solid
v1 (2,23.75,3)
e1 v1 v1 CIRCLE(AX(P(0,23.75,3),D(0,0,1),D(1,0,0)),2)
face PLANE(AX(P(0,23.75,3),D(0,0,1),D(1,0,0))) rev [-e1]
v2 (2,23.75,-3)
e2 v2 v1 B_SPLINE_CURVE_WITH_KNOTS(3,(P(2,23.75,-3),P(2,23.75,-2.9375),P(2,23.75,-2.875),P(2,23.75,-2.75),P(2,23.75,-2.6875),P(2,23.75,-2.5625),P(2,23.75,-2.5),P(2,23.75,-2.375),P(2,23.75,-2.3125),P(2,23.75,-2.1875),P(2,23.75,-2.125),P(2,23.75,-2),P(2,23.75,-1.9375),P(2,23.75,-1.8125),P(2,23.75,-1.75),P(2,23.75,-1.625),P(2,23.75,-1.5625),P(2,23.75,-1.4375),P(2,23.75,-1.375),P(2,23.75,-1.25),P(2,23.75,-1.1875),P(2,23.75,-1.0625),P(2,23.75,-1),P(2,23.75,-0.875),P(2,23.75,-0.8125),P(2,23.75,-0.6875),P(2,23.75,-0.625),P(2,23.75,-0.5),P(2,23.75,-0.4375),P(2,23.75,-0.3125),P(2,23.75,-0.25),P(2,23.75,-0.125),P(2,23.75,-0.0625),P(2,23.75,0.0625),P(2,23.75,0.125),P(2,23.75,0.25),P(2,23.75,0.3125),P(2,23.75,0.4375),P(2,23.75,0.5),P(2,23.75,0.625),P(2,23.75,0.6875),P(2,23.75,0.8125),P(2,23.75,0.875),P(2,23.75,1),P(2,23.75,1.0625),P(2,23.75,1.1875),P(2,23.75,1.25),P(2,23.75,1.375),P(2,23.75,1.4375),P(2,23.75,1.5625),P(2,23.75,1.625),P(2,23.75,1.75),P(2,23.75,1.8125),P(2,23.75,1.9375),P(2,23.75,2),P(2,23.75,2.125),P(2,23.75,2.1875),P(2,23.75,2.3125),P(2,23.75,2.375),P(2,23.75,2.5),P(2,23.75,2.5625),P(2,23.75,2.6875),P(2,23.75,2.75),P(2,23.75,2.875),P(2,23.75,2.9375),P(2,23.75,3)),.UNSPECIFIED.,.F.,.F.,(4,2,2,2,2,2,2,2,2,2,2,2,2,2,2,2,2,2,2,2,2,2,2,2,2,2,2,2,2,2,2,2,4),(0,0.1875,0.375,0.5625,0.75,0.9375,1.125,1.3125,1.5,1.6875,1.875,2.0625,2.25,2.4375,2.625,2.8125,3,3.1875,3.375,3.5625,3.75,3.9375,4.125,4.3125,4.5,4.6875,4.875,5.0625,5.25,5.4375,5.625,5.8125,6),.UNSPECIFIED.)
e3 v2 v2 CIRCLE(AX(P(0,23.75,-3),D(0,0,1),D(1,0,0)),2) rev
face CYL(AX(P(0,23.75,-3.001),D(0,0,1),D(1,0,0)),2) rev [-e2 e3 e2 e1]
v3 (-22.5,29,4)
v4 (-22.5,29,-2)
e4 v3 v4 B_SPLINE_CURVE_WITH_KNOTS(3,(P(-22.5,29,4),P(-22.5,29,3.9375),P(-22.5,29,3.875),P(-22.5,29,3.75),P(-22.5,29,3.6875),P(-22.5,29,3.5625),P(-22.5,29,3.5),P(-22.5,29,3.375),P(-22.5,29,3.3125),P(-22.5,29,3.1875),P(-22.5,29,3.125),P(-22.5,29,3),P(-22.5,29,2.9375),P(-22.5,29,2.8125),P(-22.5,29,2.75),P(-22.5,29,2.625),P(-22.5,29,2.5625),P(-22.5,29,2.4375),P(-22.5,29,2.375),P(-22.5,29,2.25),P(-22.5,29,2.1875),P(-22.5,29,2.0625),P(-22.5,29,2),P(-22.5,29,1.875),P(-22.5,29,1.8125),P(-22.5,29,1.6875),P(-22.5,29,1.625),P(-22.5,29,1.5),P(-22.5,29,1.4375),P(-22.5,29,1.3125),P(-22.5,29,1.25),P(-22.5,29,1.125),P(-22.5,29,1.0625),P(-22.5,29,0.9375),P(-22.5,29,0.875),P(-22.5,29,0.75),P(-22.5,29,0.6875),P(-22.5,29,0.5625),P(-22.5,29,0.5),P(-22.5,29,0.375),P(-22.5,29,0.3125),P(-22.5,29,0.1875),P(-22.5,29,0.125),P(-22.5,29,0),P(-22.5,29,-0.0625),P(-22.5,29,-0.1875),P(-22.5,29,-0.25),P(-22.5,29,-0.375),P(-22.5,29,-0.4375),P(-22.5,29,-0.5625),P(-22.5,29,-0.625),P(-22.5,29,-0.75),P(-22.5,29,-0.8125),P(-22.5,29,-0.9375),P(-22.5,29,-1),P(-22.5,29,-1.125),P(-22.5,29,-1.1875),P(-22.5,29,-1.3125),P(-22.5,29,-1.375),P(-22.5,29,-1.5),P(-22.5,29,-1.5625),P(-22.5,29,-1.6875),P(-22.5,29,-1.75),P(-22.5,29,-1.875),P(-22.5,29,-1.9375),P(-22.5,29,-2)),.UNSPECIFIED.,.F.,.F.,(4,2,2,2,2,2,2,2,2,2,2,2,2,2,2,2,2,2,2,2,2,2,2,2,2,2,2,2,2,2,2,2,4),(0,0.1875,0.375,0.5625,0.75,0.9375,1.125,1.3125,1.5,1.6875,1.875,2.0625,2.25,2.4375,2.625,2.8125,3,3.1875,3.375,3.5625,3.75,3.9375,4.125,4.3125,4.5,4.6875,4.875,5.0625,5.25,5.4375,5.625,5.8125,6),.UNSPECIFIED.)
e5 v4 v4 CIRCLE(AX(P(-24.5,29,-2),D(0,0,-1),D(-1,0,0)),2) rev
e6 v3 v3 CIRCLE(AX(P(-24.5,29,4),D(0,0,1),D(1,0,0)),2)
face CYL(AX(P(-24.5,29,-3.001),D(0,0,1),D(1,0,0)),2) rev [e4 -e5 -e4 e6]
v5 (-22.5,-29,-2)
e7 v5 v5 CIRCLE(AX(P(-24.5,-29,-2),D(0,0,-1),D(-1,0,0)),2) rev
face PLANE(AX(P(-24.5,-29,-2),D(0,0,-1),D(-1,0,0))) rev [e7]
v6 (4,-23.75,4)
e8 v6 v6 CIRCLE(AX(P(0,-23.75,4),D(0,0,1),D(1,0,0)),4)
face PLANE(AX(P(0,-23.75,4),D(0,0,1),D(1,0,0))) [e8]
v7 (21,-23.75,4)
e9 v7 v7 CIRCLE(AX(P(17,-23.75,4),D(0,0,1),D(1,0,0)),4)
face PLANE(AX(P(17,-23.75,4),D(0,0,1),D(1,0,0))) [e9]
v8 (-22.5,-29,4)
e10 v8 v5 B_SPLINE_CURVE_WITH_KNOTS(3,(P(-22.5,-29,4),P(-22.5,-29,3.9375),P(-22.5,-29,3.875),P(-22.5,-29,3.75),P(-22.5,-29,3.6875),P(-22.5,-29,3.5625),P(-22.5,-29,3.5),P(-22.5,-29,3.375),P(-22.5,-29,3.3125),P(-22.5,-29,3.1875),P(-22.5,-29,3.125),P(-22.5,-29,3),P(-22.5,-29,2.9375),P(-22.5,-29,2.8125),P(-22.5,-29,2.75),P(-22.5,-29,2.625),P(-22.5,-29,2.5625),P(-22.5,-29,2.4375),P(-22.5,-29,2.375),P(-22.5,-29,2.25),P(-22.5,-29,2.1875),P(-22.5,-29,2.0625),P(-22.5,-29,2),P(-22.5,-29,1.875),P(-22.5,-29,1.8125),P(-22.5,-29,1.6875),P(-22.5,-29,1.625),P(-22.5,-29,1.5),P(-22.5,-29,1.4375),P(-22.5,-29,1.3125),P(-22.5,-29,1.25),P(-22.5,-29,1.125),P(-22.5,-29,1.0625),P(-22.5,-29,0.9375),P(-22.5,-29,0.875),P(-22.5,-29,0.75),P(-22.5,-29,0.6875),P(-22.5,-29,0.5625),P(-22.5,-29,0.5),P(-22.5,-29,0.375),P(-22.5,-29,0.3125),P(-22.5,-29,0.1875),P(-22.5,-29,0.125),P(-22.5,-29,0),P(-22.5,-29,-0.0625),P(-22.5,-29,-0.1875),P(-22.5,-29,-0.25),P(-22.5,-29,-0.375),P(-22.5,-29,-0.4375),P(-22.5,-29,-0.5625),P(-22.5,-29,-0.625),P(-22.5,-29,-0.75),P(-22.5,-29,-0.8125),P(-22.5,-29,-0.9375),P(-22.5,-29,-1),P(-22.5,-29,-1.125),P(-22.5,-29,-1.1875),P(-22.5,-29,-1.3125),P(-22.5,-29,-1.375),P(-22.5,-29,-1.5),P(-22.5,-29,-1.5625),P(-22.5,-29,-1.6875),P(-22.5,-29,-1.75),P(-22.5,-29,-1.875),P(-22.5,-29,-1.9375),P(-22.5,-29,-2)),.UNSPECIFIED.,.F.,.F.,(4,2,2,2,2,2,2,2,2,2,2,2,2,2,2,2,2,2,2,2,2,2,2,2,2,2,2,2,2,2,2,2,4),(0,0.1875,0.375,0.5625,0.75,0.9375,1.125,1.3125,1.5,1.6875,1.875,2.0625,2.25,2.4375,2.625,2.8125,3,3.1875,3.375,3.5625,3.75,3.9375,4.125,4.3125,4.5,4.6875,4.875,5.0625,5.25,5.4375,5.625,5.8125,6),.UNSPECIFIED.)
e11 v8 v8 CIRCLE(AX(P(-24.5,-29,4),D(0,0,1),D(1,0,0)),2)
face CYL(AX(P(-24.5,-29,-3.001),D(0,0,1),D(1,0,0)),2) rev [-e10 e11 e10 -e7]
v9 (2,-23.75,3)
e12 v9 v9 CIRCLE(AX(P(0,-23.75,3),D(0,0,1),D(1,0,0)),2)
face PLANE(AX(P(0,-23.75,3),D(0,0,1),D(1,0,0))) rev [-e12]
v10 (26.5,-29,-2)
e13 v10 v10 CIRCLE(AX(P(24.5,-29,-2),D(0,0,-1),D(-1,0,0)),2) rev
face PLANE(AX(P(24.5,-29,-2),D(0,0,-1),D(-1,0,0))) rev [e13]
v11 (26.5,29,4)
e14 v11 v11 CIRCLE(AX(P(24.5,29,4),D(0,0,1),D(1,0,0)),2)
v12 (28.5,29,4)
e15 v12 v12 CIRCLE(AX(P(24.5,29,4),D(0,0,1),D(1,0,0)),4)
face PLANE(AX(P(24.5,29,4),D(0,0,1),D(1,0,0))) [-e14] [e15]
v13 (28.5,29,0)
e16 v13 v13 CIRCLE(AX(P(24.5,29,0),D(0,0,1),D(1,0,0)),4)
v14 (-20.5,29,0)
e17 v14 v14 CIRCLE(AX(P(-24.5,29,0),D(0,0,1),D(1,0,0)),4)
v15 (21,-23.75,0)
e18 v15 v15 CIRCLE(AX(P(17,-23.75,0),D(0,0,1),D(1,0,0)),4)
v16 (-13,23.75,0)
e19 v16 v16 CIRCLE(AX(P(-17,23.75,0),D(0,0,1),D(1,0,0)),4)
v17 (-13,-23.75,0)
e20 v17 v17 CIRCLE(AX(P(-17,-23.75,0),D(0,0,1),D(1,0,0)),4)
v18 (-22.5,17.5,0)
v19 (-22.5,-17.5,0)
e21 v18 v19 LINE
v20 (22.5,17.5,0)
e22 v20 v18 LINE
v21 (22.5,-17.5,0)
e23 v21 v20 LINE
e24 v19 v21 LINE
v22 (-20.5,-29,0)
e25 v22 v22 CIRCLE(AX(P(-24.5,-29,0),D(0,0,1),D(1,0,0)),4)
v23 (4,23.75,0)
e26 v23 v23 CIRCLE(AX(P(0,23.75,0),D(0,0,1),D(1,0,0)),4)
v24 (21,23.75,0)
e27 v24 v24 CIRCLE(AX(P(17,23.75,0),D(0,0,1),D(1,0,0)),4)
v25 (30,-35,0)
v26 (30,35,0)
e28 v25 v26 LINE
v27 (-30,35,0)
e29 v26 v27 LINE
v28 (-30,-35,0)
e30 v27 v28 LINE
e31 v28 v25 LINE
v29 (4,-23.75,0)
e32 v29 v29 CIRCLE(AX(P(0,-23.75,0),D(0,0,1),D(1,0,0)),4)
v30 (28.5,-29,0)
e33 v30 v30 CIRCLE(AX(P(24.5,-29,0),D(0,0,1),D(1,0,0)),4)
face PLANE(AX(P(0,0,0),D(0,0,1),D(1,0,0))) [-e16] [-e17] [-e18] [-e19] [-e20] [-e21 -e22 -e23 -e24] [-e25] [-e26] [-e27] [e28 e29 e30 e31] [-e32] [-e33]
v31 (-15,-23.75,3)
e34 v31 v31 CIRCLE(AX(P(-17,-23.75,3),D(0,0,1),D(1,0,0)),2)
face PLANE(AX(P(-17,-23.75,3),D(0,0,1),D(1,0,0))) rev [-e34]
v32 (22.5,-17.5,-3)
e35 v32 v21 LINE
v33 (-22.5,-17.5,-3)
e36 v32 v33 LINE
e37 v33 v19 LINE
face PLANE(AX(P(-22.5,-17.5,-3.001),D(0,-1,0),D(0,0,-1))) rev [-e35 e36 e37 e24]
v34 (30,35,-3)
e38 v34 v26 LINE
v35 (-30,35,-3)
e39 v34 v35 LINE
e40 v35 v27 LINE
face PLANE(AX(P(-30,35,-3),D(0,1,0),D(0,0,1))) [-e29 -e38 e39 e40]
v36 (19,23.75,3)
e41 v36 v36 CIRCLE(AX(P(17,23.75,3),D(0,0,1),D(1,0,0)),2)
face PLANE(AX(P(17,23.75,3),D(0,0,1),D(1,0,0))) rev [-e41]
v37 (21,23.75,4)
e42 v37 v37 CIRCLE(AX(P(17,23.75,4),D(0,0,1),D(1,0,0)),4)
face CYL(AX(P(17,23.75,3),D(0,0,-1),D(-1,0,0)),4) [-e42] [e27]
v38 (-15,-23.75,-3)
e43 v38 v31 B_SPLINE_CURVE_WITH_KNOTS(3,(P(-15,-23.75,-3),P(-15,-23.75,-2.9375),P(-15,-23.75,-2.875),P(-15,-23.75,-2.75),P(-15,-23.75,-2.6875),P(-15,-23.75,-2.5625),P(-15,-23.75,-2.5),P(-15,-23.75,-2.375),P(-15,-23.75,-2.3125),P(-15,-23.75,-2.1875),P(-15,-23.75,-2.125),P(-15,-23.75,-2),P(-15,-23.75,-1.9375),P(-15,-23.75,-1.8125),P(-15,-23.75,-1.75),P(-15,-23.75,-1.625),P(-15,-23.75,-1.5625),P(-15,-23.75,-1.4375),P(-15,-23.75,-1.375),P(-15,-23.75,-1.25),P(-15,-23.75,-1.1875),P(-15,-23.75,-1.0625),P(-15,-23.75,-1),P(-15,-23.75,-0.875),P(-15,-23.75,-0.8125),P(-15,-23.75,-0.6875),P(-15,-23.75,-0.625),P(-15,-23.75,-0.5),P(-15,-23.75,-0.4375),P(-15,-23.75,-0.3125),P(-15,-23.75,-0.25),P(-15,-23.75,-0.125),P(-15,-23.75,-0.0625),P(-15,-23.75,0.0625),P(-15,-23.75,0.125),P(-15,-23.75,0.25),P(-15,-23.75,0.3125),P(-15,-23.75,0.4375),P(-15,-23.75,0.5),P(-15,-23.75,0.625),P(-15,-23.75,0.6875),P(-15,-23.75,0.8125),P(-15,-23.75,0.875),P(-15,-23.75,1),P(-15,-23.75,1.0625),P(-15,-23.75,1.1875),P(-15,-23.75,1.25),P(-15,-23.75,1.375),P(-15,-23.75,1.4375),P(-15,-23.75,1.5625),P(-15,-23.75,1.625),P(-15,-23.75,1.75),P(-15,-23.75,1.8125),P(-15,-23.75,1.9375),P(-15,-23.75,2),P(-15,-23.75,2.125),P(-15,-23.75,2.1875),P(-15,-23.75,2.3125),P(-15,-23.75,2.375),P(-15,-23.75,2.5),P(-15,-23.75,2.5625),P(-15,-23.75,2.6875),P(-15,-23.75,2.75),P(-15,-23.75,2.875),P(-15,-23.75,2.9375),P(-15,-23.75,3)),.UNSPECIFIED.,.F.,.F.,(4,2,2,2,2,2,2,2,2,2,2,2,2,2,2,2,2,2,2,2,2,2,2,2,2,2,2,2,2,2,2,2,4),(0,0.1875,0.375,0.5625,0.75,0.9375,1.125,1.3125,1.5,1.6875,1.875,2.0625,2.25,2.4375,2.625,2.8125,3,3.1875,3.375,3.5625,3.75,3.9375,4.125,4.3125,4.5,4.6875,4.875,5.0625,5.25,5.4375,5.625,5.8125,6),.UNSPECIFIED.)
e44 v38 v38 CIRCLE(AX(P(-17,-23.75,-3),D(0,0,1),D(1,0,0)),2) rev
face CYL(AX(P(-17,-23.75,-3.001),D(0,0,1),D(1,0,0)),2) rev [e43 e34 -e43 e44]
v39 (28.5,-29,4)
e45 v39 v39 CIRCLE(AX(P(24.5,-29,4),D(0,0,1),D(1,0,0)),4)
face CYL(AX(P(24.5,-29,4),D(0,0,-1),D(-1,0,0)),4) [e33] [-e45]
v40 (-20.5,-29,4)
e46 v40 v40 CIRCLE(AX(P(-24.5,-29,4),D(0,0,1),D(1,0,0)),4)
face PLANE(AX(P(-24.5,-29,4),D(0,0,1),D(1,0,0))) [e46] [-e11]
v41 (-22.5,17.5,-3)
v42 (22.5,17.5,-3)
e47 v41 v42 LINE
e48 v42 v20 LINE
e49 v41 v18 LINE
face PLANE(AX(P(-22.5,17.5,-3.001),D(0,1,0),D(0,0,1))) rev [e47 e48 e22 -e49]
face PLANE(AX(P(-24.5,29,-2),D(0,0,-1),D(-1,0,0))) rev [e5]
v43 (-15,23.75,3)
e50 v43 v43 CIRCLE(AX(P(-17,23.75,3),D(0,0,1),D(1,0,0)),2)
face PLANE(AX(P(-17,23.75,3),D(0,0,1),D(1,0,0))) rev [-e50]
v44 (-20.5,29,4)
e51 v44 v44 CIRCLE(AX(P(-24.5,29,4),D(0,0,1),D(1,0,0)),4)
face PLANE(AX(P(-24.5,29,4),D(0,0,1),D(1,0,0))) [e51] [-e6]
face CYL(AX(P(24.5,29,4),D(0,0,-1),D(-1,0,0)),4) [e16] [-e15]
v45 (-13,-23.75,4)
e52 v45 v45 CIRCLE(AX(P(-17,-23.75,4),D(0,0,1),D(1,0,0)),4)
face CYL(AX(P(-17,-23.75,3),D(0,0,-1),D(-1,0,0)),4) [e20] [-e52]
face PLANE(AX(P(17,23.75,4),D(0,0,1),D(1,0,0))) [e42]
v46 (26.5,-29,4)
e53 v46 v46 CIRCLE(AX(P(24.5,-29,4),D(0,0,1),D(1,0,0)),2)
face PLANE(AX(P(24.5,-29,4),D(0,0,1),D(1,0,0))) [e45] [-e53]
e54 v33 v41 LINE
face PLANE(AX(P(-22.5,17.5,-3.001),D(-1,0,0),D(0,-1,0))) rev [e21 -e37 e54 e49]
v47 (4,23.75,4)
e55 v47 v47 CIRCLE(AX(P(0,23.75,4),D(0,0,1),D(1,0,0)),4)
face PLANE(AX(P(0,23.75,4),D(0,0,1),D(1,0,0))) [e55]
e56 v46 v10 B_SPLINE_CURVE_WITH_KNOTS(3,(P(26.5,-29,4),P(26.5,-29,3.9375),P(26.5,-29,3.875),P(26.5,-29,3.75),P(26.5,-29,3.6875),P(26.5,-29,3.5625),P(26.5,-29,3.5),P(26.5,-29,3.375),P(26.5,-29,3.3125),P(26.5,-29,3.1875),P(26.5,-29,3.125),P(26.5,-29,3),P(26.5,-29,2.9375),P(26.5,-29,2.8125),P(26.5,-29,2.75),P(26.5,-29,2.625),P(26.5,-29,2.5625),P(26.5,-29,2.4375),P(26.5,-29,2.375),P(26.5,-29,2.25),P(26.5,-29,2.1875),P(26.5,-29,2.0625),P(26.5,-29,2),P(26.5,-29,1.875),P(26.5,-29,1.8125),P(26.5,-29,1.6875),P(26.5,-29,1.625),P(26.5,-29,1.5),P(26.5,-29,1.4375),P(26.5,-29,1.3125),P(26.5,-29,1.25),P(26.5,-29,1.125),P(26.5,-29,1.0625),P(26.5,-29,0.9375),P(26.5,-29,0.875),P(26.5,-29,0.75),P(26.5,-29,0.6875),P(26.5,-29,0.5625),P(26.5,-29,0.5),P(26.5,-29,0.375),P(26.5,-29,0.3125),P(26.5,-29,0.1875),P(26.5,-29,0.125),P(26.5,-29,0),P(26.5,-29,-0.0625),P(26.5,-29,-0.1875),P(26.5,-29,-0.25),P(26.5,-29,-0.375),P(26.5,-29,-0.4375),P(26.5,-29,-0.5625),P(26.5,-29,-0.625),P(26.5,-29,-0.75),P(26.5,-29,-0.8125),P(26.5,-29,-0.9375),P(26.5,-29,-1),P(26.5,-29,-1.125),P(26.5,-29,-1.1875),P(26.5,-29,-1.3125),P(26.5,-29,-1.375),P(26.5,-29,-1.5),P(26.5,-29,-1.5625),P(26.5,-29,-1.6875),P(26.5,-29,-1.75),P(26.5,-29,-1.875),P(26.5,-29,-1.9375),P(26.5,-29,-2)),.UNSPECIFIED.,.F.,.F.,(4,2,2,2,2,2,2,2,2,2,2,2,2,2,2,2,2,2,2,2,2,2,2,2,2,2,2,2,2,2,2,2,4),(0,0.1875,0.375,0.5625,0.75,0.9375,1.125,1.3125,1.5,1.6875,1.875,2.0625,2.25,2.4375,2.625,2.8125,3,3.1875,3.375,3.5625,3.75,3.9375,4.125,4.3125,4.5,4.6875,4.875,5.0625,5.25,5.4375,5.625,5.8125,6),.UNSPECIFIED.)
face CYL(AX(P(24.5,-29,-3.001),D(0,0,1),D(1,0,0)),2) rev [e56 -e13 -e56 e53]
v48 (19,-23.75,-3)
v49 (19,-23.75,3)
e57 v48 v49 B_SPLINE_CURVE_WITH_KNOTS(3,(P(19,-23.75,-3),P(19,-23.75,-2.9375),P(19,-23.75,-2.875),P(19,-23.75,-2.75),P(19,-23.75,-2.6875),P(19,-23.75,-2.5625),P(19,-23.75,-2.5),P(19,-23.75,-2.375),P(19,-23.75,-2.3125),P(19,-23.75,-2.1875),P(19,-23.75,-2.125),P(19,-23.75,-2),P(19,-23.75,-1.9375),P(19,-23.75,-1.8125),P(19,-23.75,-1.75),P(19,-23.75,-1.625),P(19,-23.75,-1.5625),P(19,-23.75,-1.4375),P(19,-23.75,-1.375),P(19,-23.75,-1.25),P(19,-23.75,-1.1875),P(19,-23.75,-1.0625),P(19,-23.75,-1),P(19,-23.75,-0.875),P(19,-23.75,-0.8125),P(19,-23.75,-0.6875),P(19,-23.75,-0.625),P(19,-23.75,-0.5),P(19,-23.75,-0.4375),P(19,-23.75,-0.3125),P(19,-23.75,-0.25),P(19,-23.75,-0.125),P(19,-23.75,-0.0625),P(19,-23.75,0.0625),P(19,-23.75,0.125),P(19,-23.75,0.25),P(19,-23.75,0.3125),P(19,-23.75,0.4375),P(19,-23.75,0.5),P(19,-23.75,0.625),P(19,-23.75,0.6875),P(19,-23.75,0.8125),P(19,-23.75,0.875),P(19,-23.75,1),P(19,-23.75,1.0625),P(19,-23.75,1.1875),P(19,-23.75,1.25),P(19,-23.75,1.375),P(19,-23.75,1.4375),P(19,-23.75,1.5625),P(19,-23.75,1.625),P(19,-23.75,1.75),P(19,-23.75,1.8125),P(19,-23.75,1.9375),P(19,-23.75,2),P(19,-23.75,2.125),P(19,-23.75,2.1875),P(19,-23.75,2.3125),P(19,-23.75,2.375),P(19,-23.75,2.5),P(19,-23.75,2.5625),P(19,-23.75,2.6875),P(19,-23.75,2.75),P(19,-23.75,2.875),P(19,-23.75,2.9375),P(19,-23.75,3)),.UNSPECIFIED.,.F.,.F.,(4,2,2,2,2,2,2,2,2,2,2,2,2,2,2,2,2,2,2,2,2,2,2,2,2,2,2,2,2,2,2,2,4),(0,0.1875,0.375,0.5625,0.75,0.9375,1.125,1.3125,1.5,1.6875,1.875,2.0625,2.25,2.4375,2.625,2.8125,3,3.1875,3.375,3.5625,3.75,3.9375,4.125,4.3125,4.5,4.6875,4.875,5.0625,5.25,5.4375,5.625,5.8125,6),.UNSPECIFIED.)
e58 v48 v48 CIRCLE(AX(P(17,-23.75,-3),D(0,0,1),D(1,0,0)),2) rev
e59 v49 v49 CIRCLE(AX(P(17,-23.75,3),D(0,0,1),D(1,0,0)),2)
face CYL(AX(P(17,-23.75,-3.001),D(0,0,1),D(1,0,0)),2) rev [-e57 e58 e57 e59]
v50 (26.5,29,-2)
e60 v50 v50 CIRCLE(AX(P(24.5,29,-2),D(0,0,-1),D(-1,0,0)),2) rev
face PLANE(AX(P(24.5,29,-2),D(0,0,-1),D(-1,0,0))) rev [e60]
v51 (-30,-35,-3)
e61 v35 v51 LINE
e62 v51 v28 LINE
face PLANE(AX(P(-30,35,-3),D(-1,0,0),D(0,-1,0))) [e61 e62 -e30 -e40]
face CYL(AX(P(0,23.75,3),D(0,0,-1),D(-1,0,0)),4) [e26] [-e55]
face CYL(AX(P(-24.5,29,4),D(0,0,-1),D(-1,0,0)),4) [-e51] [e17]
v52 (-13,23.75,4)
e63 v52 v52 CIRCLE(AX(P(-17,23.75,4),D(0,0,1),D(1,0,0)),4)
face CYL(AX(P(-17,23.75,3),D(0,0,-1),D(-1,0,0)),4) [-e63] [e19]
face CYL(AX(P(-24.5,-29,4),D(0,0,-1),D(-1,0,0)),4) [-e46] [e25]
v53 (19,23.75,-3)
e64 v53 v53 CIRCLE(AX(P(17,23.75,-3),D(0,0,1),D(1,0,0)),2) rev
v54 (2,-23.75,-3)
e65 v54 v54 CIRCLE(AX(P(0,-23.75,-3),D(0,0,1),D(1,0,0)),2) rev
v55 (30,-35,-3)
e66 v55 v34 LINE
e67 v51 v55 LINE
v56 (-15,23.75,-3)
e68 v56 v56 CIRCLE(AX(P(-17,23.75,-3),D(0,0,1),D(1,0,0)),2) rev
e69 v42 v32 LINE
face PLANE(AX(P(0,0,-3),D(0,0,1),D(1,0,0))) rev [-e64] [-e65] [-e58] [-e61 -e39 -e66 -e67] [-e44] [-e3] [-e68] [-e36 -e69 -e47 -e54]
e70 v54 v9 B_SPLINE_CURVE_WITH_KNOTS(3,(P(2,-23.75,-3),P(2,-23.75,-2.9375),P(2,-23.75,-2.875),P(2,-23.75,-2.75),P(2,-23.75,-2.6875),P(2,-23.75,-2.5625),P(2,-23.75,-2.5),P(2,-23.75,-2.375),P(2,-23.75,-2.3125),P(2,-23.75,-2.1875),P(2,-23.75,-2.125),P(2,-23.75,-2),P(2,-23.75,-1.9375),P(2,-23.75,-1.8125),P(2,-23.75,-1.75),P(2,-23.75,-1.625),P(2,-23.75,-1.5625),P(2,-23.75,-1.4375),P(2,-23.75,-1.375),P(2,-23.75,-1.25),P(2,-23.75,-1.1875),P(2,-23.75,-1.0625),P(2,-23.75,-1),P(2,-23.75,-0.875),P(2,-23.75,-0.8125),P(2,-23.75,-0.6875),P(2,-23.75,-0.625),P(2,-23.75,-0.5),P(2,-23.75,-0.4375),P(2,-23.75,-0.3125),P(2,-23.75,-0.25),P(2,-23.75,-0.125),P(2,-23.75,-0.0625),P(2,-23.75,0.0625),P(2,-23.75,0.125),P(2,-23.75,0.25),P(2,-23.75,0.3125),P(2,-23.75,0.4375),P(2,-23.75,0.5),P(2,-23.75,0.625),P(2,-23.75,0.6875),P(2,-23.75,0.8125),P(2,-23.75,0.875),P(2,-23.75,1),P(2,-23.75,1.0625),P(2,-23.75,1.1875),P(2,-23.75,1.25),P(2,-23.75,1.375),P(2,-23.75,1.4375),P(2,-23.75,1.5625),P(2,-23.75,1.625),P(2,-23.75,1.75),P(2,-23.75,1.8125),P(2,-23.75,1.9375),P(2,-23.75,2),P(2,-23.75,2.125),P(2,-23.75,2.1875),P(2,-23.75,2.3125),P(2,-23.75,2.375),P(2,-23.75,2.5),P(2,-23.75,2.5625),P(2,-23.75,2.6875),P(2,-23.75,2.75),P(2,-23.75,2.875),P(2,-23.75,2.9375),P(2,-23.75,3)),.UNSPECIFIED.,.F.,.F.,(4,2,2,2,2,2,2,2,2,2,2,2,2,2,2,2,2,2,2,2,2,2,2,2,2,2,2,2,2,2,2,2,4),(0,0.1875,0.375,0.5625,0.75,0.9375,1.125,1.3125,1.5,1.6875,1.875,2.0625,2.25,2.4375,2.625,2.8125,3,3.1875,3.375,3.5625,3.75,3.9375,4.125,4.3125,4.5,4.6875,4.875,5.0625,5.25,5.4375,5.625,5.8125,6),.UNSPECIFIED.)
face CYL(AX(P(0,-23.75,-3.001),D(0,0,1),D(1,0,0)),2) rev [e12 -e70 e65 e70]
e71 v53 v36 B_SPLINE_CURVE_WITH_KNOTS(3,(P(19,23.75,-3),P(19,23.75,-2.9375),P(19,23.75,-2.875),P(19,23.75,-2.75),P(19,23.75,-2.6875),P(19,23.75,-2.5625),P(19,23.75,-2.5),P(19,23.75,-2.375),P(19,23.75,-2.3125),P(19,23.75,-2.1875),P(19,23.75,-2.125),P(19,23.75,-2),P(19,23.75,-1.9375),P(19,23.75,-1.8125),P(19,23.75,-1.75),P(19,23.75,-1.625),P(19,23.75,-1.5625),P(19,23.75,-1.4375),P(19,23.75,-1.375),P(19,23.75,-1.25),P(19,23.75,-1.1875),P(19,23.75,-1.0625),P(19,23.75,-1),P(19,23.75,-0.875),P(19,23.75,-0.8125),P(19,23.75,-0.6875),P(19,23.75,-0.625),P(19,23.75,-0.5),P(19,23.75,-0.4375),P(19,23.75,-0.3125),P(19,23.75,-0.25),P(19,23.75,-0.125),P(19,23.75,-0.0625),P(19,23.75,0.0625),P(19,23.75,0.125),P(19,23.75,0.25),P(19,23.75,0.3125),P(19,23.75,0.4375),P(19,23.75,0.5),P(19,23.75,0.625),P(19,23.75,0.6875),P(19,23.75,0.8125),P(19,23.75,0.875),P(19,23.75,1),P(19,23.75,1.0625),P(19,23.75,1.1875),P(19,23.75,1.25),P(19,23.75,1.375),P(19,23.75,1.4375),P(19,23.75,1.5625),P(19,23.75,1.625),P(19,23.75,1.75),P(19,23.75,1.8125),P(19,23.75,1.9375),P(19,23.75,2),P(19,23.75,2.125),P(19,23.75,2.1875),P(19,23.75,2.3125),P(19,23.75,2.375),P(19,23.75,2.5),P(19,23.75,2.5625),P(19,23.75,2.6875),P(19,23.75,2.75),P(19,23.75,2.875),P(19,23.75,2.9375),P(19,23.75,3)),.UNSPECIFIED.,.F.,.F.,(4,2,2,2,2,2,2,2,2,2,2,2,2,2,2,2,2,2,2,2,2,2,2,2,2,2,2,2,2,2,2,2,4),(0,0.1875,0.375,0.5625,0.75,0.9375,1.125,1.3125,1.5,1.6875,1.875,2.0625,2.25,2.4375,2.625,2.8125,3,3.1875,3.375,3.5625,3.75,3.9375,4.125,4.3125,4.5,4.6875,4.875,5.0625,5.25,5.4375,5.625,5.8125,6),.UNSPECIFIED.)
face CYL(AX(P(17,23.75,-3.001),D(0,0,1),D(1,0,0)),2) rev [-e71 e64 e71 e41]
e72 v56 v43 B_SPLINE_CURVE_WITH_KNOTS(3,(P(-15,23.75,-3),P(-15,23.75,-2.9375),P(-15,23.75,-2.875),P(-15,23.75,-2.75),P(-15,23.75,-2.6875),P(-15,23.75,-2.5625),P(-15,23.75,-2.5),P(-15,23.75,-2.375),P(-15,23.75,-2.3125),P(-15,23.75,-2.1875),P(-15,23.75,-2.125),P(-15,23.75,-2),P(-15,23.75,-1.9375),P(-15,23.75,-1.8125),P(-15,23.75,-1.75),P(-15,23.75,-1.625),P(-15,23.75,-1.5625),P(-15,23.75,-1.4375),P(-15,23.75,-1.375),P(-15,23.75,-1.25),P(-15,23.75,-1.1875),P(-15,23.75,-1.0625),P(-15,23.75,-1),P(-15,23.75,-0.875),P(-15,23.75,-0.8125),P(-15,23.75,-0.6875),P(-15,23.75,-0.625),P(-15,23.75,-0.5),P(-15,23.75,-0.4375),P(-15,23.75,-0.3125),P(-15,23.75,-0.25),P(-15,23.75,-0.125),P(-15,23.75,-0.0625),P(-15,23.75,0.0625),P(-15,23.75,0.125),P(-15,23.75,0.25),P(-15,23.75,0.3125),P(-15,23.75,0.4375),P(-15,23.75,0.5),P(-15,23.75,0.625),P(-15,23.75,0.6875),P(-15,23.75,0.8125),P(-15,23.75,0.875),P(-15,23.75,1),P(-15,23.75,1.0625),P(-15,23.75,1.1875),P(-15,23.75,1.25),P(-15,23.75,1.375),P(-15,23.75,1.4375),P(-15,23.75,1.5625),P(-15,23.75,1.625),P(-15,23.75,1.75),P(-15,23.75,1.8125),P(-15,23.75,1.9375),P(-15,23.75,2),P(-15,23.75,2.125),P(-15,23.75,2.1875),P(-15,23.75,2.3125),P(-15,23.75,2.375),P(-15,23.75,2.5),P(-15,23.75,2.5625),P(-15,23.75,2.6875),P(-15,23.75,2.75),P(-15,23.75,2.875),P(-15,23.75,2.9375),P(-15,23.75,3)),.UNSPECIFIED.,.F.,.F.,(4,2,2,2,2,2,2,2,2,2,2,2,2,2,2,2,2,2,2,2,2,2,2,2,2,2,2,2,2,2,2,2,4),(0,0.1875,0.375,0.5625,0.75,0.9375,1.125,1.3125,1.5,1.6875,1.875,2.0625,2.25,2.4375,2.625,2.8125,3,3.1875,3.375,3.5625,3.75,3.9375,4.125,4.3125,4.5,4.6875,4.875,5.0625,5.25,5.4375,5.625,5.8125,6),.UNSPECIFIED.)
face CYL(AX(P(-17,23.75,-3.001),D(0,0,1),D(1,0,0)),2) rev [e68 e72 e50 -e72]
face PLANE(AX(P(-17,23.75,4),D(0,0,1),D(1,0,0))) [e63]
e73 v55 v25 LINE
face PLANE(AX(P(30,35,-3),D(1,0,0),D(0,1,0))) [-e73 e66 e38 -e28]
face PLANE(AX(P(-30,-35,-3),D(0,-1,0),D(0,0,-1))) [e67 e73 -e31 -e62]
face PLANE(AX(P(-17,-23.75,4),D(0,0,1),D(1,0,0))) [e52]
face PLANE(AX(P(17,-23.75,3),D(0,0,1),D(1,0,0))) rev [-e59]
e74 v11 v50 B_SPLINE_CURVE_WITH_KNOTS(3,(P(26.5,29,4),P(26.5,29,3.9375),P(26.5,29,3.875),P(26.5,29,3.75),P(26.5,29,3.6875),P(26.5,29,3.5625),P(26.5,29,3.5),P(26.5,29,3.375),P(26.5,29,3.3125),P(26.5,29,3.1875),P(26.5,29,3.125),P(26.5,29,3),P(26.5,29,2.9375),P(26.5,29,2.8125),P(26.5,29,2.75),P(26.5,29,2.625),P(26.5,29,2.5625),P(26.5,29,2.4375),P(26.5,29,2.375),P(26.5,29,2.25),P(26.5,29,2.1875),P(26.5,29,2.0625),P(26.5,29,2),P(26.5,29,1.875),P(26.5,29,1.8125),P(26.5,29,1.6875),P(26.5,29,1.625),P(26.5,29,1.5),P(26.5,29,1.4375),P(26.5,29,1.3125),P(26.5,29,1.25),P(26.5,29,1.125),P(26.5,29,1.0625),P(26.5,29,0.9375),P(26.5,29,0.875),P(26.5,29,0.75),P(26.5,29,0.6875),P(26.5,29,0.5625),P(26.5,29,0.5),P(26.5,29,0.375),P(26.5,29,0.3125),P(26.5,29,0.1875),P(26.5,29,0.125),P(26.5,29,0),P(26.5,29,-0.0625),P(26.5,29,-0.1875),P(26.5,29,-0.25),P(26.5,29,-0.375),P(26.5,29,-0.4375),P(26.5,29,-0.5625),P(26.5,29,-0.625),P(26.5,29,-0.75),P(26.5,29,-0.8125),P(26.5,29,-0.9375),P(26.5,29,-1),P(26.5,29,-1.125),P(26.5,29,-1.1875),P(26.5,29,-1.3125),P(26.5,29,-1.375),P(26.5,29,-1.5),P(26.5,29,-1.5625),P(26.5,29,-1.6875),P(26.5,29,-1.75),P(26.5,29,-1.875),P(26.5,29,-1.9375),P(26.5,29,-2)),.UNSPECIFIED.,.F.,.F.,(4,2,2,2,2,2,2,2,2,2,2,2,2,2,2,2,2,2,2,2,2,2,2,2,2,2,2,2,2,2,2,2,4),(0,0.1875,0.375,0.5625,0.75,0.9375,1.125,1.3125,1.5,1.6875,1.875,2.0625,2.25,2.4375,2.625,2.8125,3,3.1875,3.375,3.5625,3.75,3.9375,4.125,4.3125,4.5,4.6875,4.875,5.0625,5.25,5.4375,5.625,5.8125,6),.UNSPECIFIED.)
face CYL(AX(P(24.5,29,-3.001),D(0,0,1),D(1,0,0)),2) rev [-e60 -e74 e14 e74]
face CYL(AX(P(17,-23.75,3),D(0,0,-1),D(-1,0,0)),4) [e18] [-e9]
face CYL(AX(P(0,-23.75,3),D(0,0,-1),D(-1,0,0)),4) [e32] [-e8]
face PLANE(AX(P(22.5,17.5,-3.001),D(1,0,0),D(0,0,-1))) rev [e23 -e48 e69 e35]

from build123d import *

# Parameters (mm, degrees)
ESQUISSE1_W               = 60
ESQUISSE1_H               = 70
T_LE_DE_BASE_PLI_E1_DEPTH = 3
ENL_V_MAT_EXTRU_1_REACH   = 48.195
ESQUISSE6_R               = 2
ENL_V_MAT_EXTRU_2_REACH   = 48.195
ESQUISSE7_R               = 2
BOSS_EXTRU_1_START        = 4
ESQUISSE9_R               = 4
ESQUISSE9_R_2             = 2
BOSS_EXTRU_1_DEPTH        = 4
ENL_V_MAT_EXTRU_3_REACH   = 48.271
ESQUISSE10_W              = 45
ESQUISSE10_H              = 35
BOSS_EXTRU_2_START        = -1
ESQUISSE11_R              = 2
BOSS_EXTRU_2_DEPTH        = 1
BOSS_EXTRU_3_START        = 3
ESQUISSE12_R              = 4
ESQUISSE12_R_2            = 2
BOSS_EXTRU_3_DEPTH        = 3
BOSS_EXTRU_4_START        = 1
ESQUISSE13_R              = 4
BOSS_EXTRU_4_DEPTH        = 1


# Sheet-metal steps are written as plain solids
with BuildPart() as part:
    # Esquisse1 → Tôle de base pliée1 (new body)
    with BuildSketch(Plane.XY):
        Rectangle(ESQUISSE1_W, ESQUISSE1_H)
    extrude(amount=-T_LE_DE_BASE_PLI_E1_DEPTH)

    # Esquisse6 → Enlèv. mat.-Extru.1 (cut, up to next)
    with BuildSketch(Plane.XY, mode=Mode.PRIVATE) as enl_v_mat_extru_1_sk1:
        with Locations((-24.5, 29)):
            Circle(ESQUISSE6_R)
    enl_v_mat_extru_1_tool1 = extrude(enl_v_mat_extru_1_sk1.sketch, amount=-ENL_V_MAT_EXTRU_1_REACH, mode=Mode.PRIVATE) & part.part
    # Esquisse6 → Enlèv. mat.-Extru.1 (cut, up to next)
    with BuildSketch(Plane.XY, mode=Mode.PRIVATE) as enl_v_mat_extru_1_sk2:
        with Locations((24.5, 29)):
            Circle(ESQUISSE6_R)
    enl_v_mat_extru_1_tool2 = extrude(enl_v_mat_extru_1_sk2.sketch, amount=-ENL_V_MAT_EXTRU_1_REACH, mode=Mode.PRIVATE) & part.part
    # Esquisse6 → Enlèv. mat.-Extru.1 (cut, up to next)
    with BuildSketch(Plane.XY, mode=Mode.PRIVATE) as enl_v_mat_extru_1_sk3:
        with Locations((24.5, -29)):
            Circle(ESQUISSE6_R)
    enl_v_mat_extru_1_tool3 = extrude(enl_v_mat_extru_1_sk3.sketch, amount=-ENL_V_MAT_EXTRU_1_REACH, mode=Mode.PRIVATE) & part.part
    # Esquisse6 → Enlèv. mat.-Extru.1 (cut, up to next)
    with BuildSketch(Plane.XY, mode=Mode.PRIVATE) as enl_v_mat_extru_1_sk4:
        with Locations((-24.5, -29)):
            Circle(ESQUISSE6_R)
    enl_v_mat_extru_1_tool4 = extrude(enl_v_mat_extru_1_sk4.sketch, amount=-ENL_V_MAT_EXTRU_1_REACH, mode=Mode.PRIVATE) & part.part
    add(enl_v_mat_extru_1_tool1.solids().sort_by_distance((-24.5, 29, 0))[0], mode=Mode.SUBTRACT)
    add(enl_v_mat_extru_1_tool2.solids().sort_by_distance((24.5, 29, 0))[0], mode=Mode.SUBTRACT)
    add(enl_v_mat_extru_1_tool3.solids().sort_by_distance((24.5, -29, 0))[0], mode=Mode.SUBTRACT)
    add(enl_v_mat_extru_1_tool4.solids().sort_by_distance((-24.5, -29, 0))[0], mode=Mode.SUBTRACT)

    # Esquisse7 → Enlèv. mat.-Extru.2 (cut, up to next)
    with BuildSketch(Plane.XY, mode=Mode.PRIVATE) as enl_v_mat_extru_2_sk1:
        with Locations((-17, -23.75)):
            Circle(ESQUISSE7_R)
    enl_v_mat_extru_2_tool1 = extrude(enl_v_mat_extru_2_sk1.sketch, amount=-ENL_V_MAT_EXTRU_2_REACH, mode=Mode.PRIVATE) & part.part
    # Esquisse7 → Enlèv. mat.-Extru.2 (cut, up to next)
    with BuildSketch(Plane.XY, mode=Mode.PRIVATE) as enl_v_mat_extru_2_sk2:
        with Locations((0, -23.75)):
            Circle(ESQUISSE7_R)
    enl_v_mat_extru_2_tool2 = extrude(enl_v_mat_extru_2_sk2.sketch, amount=-ENL_V_MAT_EXTRU_2_REACH, mode=Mode.PRIVATE) & part.part
    # Esquisse7 → Enlèv. mat.-Extru.2 (cut, up to next)
    with BuildSketch(Plane.XY, mode=Mode.PRIVATE) as enl_v_mat_extru_2_sk3:
        with Locations((17, -23.75)):
            Circle(ESQUISSE7_R)
    enl_v_mat_extru_2_tool3 = extrude(enl_v_mat_extru_2_sk3.sketch, amount=-ENL_V_MAT_EXTRU_2_REACH, mode=Mode.PRIVATE) & part.part
    # Esquisse7 → Enlèv. mat.-Extru.2 (cut, up to next)
    with BuildSketch(Plane.XY, mode=Mode.PRIVATE) as enl_v_mat_extru_2_sk4:
        with Locations((0, 23.75)):
            Circle(ESQUISSE7_R)
    enl_v_mat_extru_2_tool4 = extrude(enl_v_mat_extru_2_sk4.sketch, amount=-ENL_V_MAT_EXTRU_2_REACH, mode=Mode.PRIVATE) & part.part
    # Esquisse7 → Enlèv. mat.-Extru.2 (cut, up to next)
    with BuildSketch(Plane.XY, mode=Mode.PRIVATE) as enl_v_mat_extru_2_sk5:
        with Locations((17, 23.75)):
            Circle(ESQUISSE7_R)
    enl_v_mat_extru_2_tool5 = extrude(enl_v_mat_extru_2_sk5.sketch, amount=-ENL_V_MAT_EXTRU_2_REACH, mode=Mode.PRIVATE) & part.part
    # Esquisse7 → Enlèv. mat.-Extru.2 (cut, up to next)
    with BuildSketch(Plane.XY, mode=Mode.PRIVATE) as enl_v_mat_extru_2_sk6:
        with Locations((-17, 23.75)):
            Circle(ESQUISSE7_R)
    enl_v_mat_extru_2_tool6 = extrude(enl_v_mat_extru_2_sk6.sketch, amount=-ENL_V_MAT_EXTRU_2_REACH, mode=Mode.PRIVATE) & part.part
    add(enl_v_mat_extru_2_tool1.solids().sort_by_distance((-17, -23.75, 0))[0], mode=Mode.SUBTRACT)
    add(enl_v_mat_extru_2_tool2.solids().sort_by_distance((0, -23.75, 0))[0], mode=Mode.SUBTRACT)
    add(enl_v_mat_extru_2_tool3.solids().sort_by_distance((17, -23.75, 0))[0], mode=Mode.SUBTRACT)
    add(enl_v_mat_extru_2_tool4.solids().sort_by_distance((0, 23.75, 0))[0], mode=Mode.SUBTRACT)
    add(enl_v_mat_extru_2_tool5.solids().sort_by_distance((17, 23.75, 0))[0], mode=Mode.SUBTRACT)
    add(enl_v_mat_extru_2_tool6.solids().sort_by_distance((-17, 23.75, 0))[0], mode=Mode.SUBTRACT)

    # Esquisse9 → Boss.-Extru.1 (add)
    # profile 1 of 4: a face of its own
    with BuildSketch(Plane.XY.offset(BOSS_EXTRU_1_START)):
        with Locations((-24.5, 29)):
            Circle(ESQUISSE9_R)
        with Locations((-24.5, 29)):
            Circle(ESQUISSE9_R_2, mode=Mode.SUBTRACT)
    # profile 2 of 4: a face of its own
    with BuildSketch(Plane.XY.offset(BOSS_EXTRU_1_START)):
        with Locations((24.5, 29)):
            Circle(ESQUISSE9_R)
        with Locations((24.5, 29)):
            Circle(ESQUISSE9_R_2, mode=Mode.SUBTRACT)
    # profile 3 of 4: a face of its own
    with BuildSketch(Plane.XY.offset(BOSS_EXTRU_1_START)):
        with Locations((24.5, -29)):
            Circle(ESQUISSE9_R)
        with Locations((24.5, -29)):
            Circle(ESQUISSE9_R_2, mode=Mode.SUBTRACT)
    # profile 4 of 4: a face of its own
    with BuildSketch(Plane.XY.offset(BOSS_EXTRU_1_START)):
        with Locations((-24.5, -29)):
            Circle(ESQUISSE9_R)
        with Locations((-24.5, -29)):
            Circle(ESQUISSE9_R_2, mode=Mode.SUBTRACT)
    extrude(amount=-BOSS_EXTRU_1_DEPTH)

    # Esquisse10 → Enlèv. mat.-Extru.3 (cut, up to next)
    with BuildSketch(Plane.XY, mode=Mode.PRIVATE) as enl_v_mat_extru_3_sk1:
        Rectangle(ESQUISSE10_W, ESQUISSE10_H)
    enl_v_mat_extru_3_tool1 = extrude(enl_v_mat_extru_3_sk1.sketch, amount=-ENL_V_MAT_EXTRU_3_REACH, mode=Mode.PRIVATE) & part.part
    add(enl_v_mat_extru_3_tool1.solids().sort_by_distance((0, 0, 0))[0], mode=Mode.SUBTRACT)

    # Esquisse11 → Boss.-Extru.2 (add)
    with BuildSketch(Plane(origin=(0, 0, -3), x_dir=(-1, 0, 0), z_dir=(0, 0, -1)).offset(BOSS_EXTRU_2_START)):
        with Locations(Location((-24.5, -29, 0), (0, 0, 180))):
            Circle(ESQUISSE11_R)
        with Locations(Location((24.5, -29, 0), (0, 0, 180))):
            Circle(ESQUISSE11_R)
        with Locations(Location((24.5, 29, 0), (0, 0, 180))):
            Circle(ESQUISSE11_R)
        with Locations(Location((-24.5, 29, 0), (0, 0, 180))):
            Circle(ESQUISSE11_R)
    extrude(amount=BOSS_EXTRU_2_DEPTH)

    # Esquisse12 → Boss.-Extru.3 (add)
    # profile 1 of 6: a face of its own
    with BuildSketch(Plane.XY.offset(BOSS_EXTRU_3_START)):
        with Locations((-17, 23.75)):
            Circle(ESQUISSE12_R)
        with Locations((-17, 23.75)):
            Circle(ESQUISSE12_R_2, mode=Mode.SUBTRACT)
    # profile 2 of 6: a face of its own
    with BuildSketch(Plane.XY.offset(BOSS_EXTRU_3_START)):
        with Locations((0, 23.75)):
            Circle(ESQUISSE12_R)
        with Locations((0, 23.75)):
            Circle(ESQUISSE12_R_2, mode=Mode.SUBTRACT)
    # profile 3 of 6: a face of its own
    with BuildSketch(Plane.XY.offset(BOSS_EXTRU_3_START)):
        with Locations((17, 23.75)):
            Circle(ESQUISSE12_R)
        with Locations((17, 23.75)):
            Circle(ESQUISSE12_R_2, mode=Mode.SUBTRACT)
    # profile 4 of 6: a face of its own
    with BuildSketch(Plane.XY.offset(BOSS_EXTRU_3_START)):
        with Locations((17, -23.75)):
            Circle(ESQUISSE12_R)
        with Locations((17, -23.75)):
            Circle(ESQUISSE12_R_2, mode=Mode.SUBTRACT)
    # profile 5 of 6: a face of its own
    with BuildSketch(Plane.XY.offset(BOSS_EXTRU_3_START)):
        with Locations((0, -23.75)):
            Circle(ESQUISSE12_R)
        with Locations((0, -23.75)):
            Circle(ESQUISSE12_R_2, mode=Mode.SUBTRACT)
    # profile 6 of 6: a face of its own
    with BuildSketch(Plane.XY.offset(BOSS_EXTRU_3_START)):
        with Locations((-17, -23.75)):
            Circle(ESQUISSE12_R)
        with Locations((-17, -23.75)):
            Circle(ESQUISSE12_R_2, mode=Mode.SUBTRACT)
    extrude(amount=-BOSS_EXTRU_3_DEPTH)

    # Esquisse13 → Boss.-Extru.4 (add)
    with BuildSketch(Plane.XY.offset(3).offset(BOSS_EXTRU_4_START)):
        with Locations((-17, -23.75)):
            Circle(ESQUISSE13_R)
        with Locations((0, -23.75)):
            Circle(ESQUISSE13_R)
        with Locations((17, -23.75)):
            Circle(ESQUISSE13_R)
        with Locations((17, 23.75)):
            Circle(ESQUISSE13_R)
        with Locations((0, 23.75)):
            Circle(ESQUISSE13_R)
        with Locations((-17, 23.75)):
            Circle(ESQUISSE13_R)
    extrude(amount=-BOSS_EXTRU_4_DEPTH)


solid = part.part
